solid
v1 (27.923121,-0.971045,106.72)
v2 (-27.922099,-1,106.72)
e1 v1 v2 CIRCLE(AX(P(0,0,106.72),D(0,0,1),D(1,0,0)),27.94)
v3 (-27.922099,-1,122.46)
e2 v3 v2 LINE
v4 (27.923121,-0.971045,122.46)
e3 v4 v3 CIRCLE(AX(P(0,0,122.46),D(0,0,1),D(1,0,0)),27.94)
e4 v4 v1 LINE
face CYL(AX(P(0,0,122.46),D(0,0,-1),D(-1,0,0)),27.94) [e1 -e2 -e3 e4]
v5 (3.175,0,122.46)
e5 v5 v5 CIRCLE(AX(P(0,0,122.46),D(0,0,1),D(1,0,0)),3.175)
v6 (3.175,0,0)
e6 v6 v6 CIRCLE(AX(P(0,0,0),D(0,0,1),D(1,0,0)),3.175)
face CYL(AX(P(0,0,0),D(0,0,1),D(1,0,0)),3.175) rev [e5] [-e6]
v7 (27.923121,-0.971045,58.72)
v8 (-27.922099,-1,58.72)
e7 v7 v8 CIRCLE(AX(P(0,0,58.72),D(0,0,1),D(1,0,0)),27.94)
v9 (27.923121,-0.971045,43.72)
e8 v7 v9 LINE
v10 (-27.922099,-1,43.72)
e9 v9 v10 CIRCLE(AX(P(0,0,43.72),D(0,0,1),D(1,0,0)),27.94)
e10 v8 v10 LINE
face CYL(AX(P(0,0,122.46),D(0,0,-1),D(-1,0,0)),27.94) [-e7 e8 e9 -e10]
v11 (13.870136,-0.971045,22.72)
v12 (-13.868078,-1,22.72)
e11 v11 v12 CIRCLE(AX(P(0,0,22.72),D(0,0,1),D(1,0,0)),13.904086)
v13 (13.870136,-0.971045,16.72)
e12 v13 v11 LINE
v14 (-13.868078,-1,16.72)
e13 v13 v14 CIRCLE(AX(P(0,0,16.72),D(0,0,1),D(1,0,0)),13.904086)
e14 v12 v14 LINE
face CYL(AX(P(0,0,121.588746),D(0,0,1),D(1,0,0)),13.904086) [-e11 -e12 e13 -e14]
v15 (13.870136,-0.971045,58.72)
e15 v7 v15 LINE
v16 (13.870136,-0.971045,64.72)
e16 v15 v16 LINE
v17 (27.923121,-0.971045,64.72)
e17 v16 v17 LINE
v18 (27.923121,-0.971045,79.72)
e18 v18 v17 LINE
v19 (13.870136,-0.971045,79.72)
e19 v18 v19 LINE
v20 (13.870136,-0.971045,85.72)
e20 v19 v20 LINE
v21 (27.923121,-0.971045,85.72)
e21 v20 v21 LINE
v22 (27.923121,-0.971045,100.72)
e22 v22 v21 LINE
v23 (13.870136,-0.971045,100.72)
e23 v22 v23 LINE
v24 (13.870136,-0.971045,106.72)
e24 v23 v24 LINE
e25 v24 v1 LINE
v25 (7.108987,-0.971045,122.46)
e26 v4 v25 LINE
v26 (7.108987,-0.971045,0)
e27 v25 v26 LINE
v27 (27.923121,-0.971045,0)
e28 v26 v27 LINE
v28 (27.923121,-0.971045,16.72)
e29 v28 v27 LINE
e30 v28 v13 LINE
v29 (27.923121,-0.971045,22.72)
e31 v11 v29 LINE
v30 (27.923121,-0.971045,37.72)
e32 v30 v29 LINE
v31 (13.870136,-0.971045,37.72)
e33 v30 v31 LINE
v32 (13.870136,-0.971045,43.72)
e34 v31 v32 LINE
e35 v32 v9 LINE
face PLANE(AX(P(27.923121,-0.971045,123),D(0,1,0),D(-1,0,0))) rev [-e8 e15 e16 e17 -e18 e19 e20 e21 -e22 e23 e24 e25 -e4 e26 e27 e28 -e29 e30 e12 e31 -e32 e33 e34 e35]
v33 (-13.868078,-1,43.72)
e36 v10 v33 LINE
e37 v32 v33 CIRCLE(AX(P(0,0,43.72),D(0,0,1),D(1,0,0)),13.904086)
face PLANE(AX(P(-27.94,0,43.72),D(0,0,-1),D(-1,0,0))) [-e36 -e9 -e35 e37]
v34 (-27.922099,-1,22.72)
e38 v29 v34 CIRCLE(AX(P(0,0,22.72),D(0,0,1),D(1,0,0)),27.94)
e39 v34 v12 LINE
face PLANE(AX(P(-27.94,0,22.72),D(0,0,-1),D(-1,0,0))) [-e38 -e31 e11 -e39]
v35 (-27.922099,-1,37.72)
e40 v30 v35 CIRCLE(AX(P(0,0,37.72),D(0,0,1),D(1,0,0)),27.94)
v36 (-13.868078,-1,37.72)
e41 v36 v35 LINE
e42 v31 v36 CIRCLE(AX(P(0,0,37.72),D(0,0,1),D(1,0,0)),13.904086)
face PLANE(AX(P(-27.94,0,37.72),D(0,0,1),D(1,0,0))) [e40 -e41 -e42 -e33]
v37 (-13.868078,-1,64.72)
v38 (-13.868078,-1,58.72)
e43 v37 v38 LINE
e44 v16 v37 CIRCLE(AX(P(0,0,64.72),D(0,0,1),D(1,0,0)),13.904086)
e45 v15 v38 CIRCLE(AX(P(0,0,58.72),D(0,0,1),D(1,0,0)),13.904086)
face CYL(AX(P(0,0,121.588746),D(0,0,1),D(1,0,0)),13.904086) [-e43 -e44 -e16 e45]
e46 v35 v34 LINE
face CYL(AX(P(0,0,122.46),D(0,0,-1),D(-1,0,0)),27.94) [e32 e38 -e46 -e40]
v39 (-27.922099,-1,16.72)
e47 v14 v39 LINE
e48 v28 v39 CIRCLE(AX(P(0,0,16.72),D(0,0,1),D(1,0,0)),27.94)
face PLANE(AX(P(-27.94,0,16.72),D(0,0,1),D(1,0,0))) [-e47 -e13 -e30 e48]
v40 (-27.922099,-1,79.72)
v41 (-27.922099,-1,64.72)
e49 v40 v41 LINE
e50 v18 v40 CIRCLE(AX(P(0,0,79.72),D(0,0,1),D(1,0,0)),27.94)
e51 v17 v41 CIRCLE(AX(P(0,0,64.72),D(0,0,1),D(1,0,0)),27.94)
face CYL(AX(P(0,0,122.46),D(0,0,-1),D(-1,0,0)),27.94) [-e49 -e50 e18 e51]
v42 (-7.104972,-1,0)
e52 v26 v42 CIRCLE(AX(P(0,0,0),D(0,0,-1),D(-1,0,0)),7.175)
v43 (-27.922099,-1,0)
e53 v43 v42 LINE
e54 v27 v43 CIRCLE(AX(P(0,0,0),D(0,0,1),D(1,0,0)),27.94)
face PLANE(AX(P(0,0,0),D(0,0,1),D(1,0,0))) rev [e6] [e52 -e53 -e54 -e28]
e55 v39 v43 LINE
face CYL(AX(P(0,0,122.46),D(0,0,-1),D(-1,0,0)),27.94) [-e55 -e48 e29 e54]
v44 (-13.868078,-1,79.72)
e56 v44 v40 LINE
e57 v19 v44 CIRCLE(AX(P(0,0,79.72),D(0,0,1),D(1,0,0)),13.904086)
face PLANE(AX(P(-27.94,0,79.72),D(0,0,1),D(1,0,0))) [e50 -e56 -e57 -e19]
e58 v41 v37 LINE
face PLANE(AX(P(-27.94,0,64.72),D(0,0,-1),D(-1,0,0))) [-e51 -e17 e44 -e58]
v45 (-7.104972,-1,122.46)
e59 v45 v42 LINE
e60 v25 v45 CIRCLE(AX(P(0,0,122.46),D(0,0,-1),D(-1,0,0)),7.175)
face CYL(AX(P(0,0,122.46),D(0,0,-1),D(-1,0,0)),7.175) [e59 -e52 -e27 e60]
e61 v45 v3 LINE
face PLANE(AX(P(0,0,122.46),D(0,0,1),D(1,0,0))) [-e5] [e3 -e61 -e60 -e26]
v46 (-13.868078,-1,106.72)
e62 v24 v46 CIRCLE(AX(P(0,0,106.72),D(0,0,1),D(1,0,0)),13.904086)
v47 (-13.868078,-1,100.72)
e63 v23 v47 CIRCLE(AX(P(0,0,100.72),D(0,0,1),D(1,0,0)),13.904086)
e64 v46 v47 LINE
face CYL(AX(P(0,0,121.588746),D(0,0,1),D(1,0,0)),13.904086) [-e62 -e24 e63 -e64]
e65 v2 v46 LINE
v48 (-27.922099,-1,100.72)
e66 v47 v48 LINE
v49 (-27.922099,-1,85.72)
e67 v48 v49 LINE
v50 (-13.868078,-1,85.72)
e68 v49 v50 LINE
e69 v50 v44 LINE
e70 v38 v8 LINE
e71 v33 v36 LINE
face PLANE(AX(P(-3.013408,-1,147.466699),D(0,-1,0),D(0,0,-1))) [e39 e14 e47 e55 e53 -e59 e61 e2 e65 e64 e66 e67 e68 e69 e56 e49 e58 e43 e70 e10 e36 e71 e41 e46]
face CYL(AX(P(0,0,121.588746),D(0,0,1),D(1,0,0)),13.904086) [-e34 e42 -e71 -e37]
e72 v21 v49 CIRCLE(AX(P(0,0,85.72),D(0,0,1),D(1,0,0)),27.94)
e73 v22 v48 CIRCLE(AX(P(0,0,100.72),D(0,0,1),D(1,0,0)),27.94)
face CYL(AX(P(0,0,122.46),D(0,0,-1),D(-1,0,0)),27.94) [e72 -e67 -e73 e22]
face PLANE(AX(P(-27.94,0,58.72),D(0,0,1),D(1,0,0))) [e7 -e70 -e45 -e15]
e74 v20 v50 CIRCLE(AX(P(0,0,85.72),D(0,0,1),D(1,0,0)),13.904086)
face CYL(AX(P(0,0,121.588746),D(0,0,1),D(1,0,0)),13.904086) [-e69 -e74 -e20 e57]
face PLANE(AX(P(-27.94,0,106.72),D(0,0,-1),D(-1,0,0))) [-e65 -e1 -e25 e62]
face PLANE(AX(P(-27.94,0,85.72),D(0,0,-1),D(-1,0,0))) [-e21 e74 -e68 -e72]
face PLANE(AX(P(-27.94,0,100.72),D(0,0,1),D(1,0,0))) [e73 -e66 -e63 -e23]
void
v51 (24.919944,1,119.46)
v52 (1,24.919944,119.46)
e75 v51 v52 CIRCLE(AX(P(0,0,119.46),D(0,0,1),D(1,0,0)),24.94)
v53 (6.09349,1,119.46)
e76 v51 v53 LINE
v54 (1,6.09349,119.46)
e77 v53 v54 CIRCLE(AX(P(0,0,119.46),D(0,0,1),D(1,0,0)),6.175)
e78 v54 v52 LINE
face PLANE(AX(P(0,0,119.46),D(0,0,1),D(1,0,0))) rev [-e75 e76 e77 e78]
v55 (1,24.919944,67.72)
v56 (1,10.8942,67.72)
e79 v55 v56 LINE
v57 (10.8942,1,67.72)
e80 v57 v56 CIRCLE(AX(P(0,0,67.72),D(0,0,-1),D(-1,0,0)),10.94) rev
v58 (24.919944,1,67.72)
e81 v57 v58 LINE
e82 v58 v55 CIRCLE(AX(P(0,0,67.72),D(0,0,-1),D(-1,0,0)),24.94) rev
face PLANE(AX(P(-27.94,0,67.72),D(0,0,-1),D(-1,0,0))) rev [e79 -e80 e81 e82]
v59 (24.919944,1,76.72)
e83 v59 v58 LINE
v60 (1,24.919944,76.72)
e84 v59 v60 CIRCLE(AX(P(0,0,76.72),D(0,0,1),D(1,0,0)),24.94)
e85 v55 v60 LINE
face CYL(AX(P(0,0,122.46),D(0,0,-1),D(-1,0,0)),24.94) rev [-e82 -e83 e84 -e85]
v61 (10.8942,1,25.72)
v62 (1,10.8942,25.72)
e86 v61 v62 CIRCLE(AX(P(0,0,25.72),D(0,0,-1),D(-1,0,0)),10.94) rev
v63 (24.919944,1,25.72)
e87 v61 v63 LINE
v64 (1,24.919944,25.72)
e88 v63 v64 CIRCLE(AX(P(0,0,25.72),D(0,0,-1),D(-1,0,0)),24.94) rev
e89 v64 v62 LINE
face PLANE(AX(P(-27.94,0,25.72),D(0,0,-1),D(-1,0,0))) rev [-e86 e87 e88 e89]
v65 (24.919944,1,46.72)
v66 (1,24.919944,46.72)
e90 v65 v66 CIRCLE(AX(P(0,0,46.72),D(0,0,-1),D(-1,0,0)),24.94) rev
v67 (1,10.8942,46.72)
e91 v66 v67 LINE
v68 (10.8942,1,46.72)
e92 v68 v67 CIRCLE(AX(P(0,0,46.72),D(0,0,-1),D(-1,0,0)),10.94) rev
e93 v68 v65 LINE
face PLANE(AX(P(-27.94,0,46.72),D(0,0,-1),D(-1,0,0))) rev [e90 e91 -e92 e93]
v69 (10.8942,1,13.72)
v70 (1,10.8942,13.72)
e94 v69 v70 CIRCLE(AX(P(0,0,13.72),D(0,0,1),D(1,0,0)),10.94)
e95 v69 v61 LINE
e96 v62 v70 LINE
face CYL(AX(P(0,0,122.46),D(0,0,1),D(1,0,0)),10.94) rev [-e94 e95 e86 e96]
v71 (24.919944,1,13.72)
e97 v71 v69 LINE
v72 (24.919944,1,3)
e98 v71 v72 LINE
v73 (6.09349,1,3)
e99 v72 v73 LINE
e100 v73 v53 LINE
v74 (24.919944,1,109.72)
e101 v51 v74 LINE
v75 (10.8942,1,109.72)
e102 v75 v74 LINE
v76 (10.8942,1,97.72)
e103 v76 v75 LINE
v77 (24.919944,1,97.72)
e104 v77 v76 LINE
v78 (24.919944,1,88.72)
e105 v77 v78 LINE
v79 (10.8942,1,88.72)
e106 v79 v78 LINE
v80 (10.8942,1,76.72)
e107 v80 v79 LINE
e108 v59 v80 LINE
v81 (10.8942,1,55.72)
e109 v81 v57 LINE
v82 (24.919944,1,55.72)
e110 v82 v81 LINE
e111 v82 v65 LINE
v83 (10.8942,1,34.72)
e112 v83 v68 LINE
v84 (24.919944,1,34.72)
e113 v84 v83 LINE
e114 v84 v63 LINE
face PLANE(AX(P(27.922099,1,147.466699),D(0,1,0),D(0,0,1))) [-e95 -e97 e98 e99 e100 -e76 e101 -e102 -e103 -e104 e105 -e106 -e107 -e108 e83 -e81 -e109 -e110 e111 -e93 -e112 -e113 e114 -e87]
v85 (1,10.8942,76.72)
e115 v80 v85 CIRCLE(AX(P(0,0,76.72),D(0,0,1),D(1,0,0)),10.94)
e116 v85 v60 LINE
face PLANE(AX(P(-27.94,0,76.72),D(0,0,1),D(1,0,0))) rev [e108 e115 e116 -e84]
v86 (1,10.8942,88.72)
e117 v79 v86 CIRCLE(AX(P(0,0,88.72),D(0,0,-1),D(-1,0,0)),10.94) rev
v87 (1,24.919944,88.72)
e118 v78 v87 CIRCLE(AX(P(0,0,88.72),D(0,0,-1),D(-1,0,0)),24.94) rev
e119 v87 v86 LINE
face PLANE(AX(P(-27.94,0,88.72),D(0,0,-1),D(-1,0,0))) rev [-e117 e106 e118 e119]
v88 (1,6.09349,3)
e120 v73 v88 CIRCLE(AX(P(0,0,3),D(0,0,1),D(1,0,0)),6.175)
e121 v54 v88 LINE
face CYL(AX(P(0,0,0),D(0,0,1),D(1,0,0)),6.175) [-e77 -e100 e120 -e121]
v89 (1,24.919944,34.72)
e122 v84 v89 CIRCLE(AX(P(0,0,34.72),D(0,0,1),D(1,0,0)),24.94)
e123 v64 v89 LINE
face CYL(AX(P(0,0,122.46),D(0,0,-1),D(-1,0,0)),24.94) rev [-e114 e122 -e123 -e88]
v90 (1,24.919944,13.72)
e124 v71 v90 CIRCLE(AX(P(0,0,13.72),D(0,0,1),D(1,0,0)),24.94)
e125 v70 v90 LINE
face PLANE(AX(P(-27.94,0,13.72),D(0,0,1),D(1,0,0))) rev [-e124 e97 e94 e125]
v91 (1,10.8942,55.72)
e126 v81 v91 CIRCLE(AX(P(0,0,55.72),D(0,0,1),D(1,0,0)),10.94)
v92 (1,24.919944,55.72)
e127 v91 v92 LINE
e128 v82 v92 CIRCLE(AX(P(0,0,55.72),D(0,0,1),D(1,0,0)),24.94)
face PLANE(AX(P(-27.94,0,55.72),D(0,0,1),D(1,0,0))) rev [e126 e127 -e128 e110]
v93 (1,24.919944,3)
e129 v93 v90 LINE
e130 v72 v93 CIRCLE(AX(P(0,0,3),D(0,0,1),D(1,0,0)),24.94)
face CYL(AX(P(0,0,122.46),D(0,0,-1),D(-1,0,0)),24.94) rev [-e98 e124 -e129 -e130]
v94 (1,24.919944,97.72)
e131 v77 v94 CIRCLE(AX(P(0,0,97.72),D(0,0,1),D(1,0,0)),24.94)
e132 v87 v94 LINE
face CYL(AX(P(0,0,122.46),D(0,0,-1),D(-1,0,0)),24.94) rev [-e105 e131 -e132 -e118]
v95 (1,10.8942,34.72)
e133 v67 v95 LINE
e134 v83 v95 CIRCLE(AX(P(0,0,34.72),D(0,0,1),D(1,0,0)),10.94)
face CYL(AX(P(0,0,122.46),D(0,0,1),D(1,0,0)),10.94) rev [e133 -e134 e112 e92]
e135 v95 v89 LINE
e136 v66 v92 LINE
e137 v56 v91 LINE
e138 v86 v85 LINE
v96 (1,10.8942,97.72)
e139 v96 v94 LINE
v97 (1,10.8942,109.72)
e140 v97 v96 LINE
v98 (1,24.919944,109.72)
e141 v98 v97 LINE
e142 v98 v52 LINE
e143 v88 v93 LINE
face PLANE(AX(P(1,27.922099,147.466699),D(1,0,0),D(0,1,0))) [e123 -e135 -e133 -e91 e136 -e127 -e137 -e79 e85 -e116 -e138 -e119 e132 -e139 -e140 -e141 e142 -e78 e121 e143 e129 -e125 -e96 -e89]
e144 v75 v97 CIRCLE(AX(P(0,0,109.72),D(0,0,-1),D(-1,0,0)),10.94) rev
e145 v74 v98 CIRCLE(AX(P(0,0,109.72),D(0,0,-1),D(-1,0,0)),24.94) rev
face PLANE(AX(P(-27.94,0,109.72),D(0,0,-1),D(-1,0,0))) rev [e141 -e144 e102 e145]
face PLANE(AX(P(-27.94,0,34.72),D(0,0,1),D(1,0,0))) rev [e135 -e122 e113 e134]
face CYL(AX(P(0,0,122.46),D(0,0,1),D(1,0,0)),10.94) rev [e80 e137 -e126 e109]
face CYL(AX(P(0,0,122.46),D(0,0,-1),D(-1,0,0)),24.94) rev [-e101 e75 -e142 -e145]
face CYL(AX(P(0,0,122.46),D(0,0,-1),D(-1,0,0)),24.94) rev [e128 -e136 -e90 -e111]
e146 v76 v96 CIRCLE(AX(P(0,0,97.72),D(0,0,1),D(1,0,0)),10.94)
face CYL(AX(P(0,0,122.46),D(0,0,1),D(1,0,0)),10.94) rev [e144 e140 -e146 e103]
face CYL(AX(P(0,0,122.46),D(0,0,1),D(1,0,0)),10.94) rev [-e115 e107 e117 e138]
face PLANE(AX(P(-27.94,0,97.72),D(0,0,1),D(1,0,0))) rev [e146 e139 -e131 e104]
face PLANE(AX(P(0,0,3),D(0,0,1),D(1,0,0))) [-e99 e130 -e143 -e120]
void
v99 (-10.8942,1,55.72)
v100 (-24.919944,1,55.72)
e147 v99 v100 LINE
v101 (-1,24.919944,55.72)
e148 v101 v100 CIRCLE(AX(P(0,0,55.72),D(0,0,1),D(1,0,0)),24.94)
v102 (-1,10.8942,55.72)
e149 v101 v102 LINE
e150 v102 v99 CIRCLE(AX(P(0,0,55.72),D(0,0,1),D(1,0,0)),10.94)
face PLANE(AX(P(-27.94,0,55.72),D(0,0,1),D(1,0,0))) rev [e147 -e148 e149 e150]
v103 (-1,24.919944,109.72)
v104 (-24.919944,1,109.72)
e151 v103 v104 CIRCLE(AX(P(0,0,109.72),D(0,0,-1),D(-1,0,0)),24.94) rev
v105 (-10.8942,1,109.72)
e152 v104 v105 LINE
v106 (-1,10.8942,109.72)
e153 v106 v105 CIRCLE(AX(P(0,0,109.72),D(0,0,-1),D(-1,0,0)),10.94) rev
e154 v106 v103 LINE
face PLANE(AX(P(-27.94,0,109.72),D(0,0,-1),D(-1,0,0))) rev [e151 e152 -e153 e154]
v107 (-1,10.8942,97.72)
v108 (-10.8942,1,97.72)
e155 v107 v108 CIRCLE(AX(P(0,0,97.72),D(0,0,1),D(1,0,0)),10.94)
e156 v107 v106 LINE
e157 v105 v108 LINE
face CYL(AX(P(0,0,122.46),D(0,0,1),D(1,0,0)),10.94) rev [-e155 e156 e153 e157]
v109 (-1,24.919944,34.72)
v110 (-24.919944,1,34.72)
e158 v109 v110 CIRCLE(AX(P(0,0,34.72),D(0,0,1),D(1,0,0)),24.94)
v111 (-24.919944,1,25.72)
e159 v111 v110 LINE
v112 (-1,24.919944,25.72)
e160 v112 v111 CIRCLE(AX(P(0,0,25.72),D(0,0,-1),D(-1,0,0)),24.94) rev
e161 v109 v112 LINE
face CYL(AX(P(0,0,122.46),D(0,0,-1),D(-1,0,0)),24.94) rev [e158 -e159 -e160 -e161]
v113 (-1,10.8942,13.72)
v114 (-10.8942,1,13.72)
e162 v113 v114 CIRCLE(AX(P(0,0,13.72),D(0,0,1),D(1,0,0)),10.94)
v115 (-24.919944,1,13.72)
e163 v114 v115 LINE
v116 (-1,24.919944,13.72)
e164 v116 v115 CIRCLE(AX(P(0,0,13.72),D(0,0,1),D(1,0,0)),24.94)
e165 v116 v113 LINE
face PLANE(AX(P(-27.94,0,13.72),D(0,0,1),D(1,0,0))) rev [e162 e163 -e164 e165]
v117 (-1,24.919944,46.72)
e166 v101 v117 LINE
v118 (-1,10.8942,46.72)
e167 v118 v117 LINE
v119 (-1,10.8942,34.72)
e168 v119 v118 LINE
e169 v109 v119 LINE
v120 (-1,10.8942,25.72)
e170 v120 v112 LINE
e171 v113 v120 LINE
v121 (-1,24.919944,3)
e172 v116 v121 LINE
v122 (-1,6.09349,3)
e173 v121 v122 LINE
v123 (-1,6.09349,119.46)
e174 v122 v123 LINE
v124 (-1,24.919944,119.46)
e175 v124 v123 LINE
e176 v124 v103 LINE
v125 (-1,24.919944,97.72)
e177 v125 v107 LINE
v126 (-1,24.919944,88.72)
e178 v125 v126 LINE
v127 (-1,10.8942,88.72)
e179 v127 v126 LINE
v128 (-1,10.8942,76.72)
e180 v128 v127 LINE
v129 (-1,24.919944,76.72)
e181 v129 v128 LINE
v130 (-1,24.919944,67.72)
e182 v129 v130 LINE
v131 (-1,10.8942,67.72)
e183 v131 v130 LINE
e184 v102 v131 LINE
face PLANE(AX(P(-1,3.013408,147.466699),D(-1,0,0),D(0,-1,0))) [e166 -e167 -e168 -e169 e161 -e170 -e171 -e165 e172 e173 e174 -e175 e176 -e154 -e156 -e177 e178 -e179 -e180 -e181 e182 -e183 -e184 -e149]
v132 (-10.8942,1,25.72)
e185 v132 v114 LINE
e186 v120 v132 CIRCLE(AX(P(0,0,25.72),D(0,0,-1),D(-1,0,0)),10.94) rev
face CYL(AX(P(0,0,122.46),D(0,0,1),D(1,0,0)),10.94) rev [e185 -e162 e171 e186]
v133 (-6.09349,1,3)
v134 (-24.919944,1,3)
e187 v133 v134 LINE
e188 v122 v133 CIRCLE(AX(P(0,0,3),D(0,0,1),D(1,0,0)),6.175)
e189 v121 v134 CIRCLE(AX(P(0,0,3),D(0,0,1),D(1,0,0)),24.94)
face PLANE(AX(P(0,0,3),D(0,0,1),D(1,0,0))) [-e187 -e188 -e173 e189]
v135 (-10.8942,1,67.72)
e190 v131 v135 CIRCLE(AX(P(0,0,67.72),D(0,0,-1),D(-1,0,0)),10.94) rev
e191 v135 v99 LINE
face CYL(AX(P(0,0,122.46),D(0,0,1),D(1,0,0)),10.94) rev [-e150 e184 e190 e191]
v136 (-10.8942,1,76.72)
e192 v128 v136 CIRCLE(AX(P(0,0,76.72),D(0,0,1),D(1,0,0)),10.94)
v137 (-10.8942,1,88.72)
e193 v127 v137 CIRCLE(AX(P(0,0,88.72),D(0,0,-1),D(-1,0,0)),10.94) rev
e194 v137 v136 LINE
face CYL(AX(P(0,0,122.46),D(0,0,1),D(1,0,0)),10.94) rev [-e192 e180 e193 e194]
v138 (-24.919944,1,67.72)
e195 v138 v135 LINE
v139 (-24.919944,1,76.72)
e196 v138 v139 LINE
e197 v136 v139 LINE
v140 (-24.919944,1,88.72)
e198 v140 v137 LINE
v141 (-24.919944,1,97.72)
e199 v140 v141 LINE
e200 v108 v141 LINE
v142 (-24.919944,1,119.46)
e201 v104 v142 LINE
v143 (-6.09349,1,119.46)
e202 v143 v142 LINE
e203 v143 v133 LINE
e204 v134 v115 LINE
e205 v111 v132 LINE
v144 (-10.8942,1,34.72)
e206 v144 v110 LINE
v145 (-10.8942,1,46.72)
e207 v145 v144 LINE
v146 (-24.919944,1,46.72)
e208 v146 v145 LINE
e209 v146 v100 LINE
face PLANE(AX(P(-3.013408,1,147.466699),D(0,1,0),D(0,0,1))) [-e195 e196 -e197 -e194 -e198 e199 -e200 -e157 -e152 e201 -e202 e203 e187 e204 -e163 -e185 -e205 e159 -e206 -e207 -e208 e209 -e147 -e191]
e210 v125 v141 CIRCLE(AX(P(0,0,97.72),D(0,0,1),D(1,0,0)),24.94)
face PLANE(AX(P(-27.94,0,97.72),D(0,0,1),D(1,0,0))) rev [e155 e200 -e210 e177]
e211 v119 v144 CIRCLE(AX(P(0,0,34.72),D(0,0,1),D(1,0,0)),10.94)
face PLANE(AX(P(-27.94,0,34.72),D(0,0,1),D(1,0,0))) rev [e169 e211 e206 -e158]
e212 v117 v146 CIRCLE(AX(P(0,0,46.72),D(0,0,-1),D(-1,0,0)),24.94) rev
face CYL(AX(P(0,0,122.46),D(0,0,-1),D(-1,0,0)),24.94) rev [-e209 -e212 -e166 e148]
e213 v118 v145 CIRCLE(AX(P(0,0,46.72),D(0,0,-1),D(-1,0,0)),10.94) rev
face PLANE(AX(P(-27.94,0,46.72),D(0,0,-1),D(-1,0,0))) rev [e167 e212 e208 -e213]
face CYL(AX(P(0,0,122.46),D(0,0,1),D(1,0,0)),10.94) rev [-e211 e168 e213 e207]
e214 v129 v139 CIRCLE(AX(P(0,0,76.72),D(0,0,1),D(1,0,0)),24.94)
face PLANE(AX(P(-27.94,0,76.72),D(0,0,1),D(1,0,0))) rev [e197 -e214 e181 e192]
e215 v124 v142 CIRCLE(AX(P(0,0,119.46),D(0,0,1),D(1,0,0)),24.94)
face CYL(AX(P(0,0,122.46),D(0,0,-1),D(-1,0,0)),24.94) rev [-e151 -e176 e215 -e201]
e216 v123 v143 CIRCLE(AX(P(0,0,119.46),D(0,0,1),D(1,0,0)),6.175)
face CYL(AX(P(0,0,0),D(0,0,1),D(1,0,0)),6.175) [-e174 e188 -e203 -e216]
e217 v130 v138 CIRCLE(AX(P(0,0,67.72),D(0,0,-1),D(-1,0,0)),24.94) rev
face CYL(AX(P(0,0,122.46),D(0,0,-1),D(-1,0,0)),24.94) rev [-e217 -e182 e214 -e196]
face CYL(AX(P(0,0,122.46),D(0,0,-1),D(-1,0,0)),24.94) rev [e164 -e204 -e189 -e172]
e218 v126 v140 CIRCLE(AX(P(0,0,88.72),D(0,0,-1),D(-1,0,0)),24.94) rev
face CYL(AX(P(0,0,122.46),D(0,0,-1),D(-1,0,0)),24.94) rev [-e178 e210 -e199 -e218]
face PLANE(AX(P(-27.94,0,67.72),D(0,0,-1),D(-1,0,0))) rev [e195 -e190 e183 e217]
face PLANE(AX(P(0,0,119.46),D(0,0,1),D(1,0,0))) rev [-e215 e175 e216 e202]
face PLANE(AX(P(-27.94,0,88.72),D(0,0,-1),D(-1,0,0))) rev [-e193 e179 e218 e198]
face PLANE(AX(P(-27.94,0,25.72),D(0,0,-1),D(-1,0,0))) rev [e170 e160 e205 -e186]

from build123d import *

# Parameters (mm, degrees)
SKETCH3_R            = 27.94
BOSS_EXTRUDE2_DEPTH  = 122.46
SKETCH5_R            = 3.175
CUT_EXTRUDE1_DEPTH   = 129.676877488
SKETCH4_W            = 14
SKETCH4_H            = 6
SHELL1_START         = 3
SHELL1_OUTLINE_R     = 10.94
SHELL1_OUTLINE_R_2   = 6.175
SHELL1_DEPTH         = 116.46
SHELL1_2_OUTLINE_R   = 24.94
SHELL1_2_OUTLINE_R_2 = 10.94
SHELL1_2_DEPTH       = 10.72
SHELL1_START_2       = 109.72
SHELL1_3_OUTLINE_R   = 24.94
SHELL1_3_OUTLINE_R_2 = 10.94
SHELL1_3_DEPTH       = 9.74
SHELL1_START_3       = 25.72
SHELL1_4_OUTLINE_R   = 24.94
SHELL1_4_OUTLINE_R_2 = 10.94
SHELL1_4_DEPTH       = 9
SHELL1_START_4       = 46.72
SHELL1_5_OUTLINE_R   = 24.94
SHELL1_5_OUTLINE_R_2 = 10.94
SHELL1_5_DEPTH       = 9
SHELL1_START_5       = 67.72
SHELL1_6_OUTLINE_R   = 24.94
SHELL1_6_OUTLINE_R_2 = 10.94
SHELL1_6_DEPTH       = 9
SHELL1_START_6       = 88.72
SHELL1_7_OUTLINE_R   = 24.94
SHELL1_7_OUTLINE_R_2 = 10.94
SHELL1_7_DEPTH       = 9
BOSS_EXTRUDE3_REACH  = 130.677
SKETCH13_W           = 16.483162312
SKETCH13_H           = 6
CUT_EXTRUDE3_DEPTH   = 123
BOSS_EXTRUDE4_DEPTH  = 122.46


# Read off the part's stored shape, not the designer's step: Shell1
with BuildPart() as part:
    # Sketch3 → Boss-Extrude2 (new body)
    with BuildSketch(Plane.XY):
        Circle(SKETCH3_R)
    extrude(amount=BOSS_EXTRUDE2_DEPTH)

    # Sketch5 → Cut-Extrude1 (cut, through all)
    with BuildSketch(Plane.XY.offset(122.46)):
        Circle(SKETCH5_R)
    extrude(amount=-CUT_EXTRUDE1_DEPTH, mode=Mode.SUBTRACT)

    # Sketch4 → Cut-Revolve1 (revolve, cut)
    with BuildSketch(Plane(origin=(0, 0, 0), x_dir=(1, 0, 0), z_dir=(0, 1, 0)), mode=Mode.PRIVATE) as cut_revolve1_sk:
        with Locations((-20.94, -103.72)):
            Rectangle(SKETCH4_W, SKETCH4_H)
        with Locations((-20.94, -82.72)):
            Rectangle(SKETCH4_W, SKETCH4_H)
        with Locations((-20.94, -61.72)):
            Rectangle(SKETCH4_W, SKETCH4_H)
        with Locations((-20.94, -40.72)):
            Rectangle(SKETCH4_W, SKETCH4_H)
        with Locations((-20.94, -19.72)):
            Rectangle(SKETCH4_W, SKETCH4_H)
    revolve(cut_revolve1_sk.sketch.rotate(Axis((0, 0, 122.46), (0, 0, -1)), 180), axis=Axis((0, 0, 122.46), (0, 0, -1)), mode=Mode.SUBTRACT)

    # Shell1 outline → Shell1 (cut)
    with BuildSketch(Plane.XY.offset(SHELL1_START)):
        Circle(SHELL1_OUTLINE_R)
        Circle(SHELL1_OUTLINE_R_2, mode=Mode.SUBTRACT)
    extrude(amount=SHELL1_DEPTH, mode=Mode.SUBTRACT)

    # Shell1 2 outline → Shell1 2 (cut)
    with BuildSketch(Plane.XY.offset(SHELL1_START)):
        Circle(SHELL1_2_OUTLINE_R)
        Circle(SHELL1_2_OUTLINE_R_2, mode=Mode.SUBTRACT)
    extrude(amount=SHELL1_2_DEPTH, mode=Mode.SUBTRACT)

    # Shell1 3 outline → Shell1 3 (cut)
    with BuildSketch(Plane.XY.offset(SHELL1_START_2)):
        Circle(SHELL1_3_OUTLINE_R)
        Circle(SHELL1_3_OUTLINE_R_2, mode=Mode.SUBTRACT)
    extrude(amount=SHELL1_3_DEPTH, mode=Mode.SUBTRACT)

    # Shell1 4 outline → Shell1 4 (cut)
    with BuildSketch(Plane.XY.offset(SHELL1_START_3)):
        Circle(SHELL1_4_OUTLINE_R)
        Circle(SHELL1_4_OUTLINE_R_2, mode=Mode.SUBTRACT)
    extrude(amount=SHELL1_4_DEPTH, mode=Mode.SUBTRACT)

    # Shell1 5 outline → Shell1 5 (cut)
    with BuildSketch(Plane.XY.offset(SHELL1_START_4)):
        Circle(SHELL1_5_OUTLINE_R)
        Circle(SHELL1_5_OUTLINE_R_2, mode=Mode.SUBTRACT)
    extrude(amount=SHELL1_5_DEPTH, mode=Mode.SUBTRACT)

    # Shell1 6 outline → Shell1 6 (cut)
    with BuildSketch(Plane.XY.offset(SHELL1_START_5)):
        Circle(SHELL1_6_OUTLINE_R)
        Circle(SHELL1_6_OUTLINE_R_2, mode=Mode.SUBTRACT)
    extrude(amount=SHELL1_6_DEPTH, mode=Mode.SUBTRACT)

    # Shell1 7 outline → Shell1 7 (cut)
    with BuildSketch(Plane.XY.offset(SHELL1_START_6)):
        Circle(SHELL1_7_OUTLINE_R)
        Circle(SHELL1_7_OUTLINE_R_2, mode=Mode.SUBTRACT)
    extrude(amount=SHELL1_7_DEPTH, mode=Mode.SUBTRACT)

    # Boss-Extrude3: up to this face of the body (flat: up to its plane)
    boss_extrude3_end = Plane(part.part.faces().sort_by_distance((-27.149737461, 0, 122.46))[0])
    # Sketch10 → Boss-Extrude3 (add, up to the picked face)
    with BuildSketch(Plane(origin=(0, 0, 0), x_dir=(-1, 0, 0), z_dir=(0, 0, -1)), mode=Mode.PRIVATE) as boss_extrude3_sk1:
        with BuildLine():
            Line((-1, 27.922098775), (-1, 3.01340754))
            ThreePointArc((-1, 3.01340754), (0, 3.175), (1, 3.01340754))
            Line((1, 3.01340754), (1, 27.922098775))
            ThreePointArc((1, 27.922098775), (0, 27.94), (-1, 27.922098775))
        make_face()
    boss_extrude3_tool1 = split(extrude(boss_extrude3_sk1.sketch, amount=-BOSS_EXTRUDE3_REACH, mode=Mode.PRIVATE), bisect_by=boss_extrude3_end, keep=Keep.BOTH, mode=Mode.PRIVATE)
    # Sketch10 → Boss-Extrude3 (add, up to the picked face)
    with BuildSketch(Plane(origin=(0, 0, 0), x_dir=(-1, 0, 0), z_dir=(0, 0, -1)), mode=Mode.PRIVATE) as boss_extrude3_sk2:
        with BuildLine():
            Line((3.01340754, 1), (27.922098775, 1))
            ThreePointArc((27.922098775, 1), (27.94, 0), (27.922098775, -1))
            Line((27.922098775, -1), (3.01340754, -1))
            ThreePointArc((3.01340754, -1), (3.175, 0), (3.01340754, 1))
        make_face()
    boss_extrude3_tool2 = split(extrude(boss_extrude3_sk2.sketch, amount=-BOSS_EXTRUDE3_REACH, mode=Mode.PRIVATE), bisect_by=boss_extrude3_end, keep=Keep.BOTH, mode=Mode.PRIVATE)
    # Sketch10 → Boss-Extrude3 (add, up to the picked face)
    with BuildSketch(Plane(origin=(0, 0, 0), x_dir=(-1, 0, 0), z_dir=(0, 0, -1)), mode=Mode.PRIVATE) as boss_extrude3_sk3:
        with BuildLine():
            Line((-1, -3.01340754), (-1, -27.922098775))
            ThreePointArc((-1, -27.922098775), (0, -27.94), (1, -27.922098775))
            Line((1, -27.922098775), (1, -3.01340754))
            ThreePointArc((1, -3.01340754), (0, -3.175), (-1, -3.01340754))
        make_face()
    boss_extrude3_tool3 = split(extrude(boss_extrude3_sk3.sketch, amount=-BOSS_EXTRUDE3_REACH, mode=Mode.PRIVATE), bisect_by=boss_extrude3_end, keep=Keep.BOTH, mode=Mode.PRIVATE)
    # Sketch10 → Boss-Extrude3 (add, up to the picked face)
    with BuildSketch(Plane(origin=(0, 0, 0), x_dir=(-1, 0, 0), z_dir=(0, 0, -1)), mode=Mode.PRIVATE) as boss_extrude3_sk4:
        with BuildLine():
            Line((-27.922098775, -1), (-3.01340754, -1))
            ThreePointArc((-3.01340754, -1), (-3.175, 0), (-3.01340754, 1))
            Line((-3.01340754, 1), (-27.922098775, 1))
            ThreePointArc((-27.922098775, 1), (-27.94, 0), (-27.922098775, -1))
        make_face()
    boss_extrude3_tool4 = split(extrude(boss_extrude3_sk4.sketch, amount=-BOSS_EXTRUDE3_REACH, mode=Mode.PRIVATE), bisect_by=boss_extrude3_end, keep=Keep.BOTH, mode=Mode.PRIVATE)
    add(boss_extrude3_tool1.solids().sort_by(Axis((0, 15.527819, 0), (0, 0, 1)))[0])
    add(boss_extrude3_tool2.solids().sort_by(Axis((-15.527819, 0, 0), (0, 0, 1)))[0])
    add(boss_extrude3_tool3.solids().sort_by(Axis((0, -15.527819, 0), (0, 0, 1)))[0])
    add(boss_extrude3_tool4.solids().sort_by(Axis((15.527819, 0, 0), (0, 0, 1)))[0])

    # Sketch13 → Cut-Revolve2 (revolve, cut)
    with BuildSketch(Plane(origin=(0, 0, 0), x_dir=(1, 0, 0), z_dir=(0, 1, 0)), mode=Mode.PRIVATE) as cut_revolve2_sk:
        with Locations((-22.145666886, -40.72)):
            Rectangle(SKETCH13_W, SKETCH13_H)
        with Locations((-22.145666886, -19.72)):
            Rectangle(SKETCH13_W, SKETCH13_H)
        with Locations((-22.145666886, -61.72)):
            Rectangle(SKETCH13_W, SKETCH13_H)
        with Locations((-22.145666886, -82.72)):
            Rectangle(SKETCH13_W, SKETCH13_H)
        with Locations((-22.145666886, -103.72)):
            Rectangle(SKETCH13_W, SKETCH13_H)
    revolve(cut_revolve2_sk.sketch.rotate(Axis((0, 0, 121.588746248), (0, 0, -1)), 180), axis=Axis((0, 0, 121.588746248), (0, 0, -1)), mode=Mode.SUBTRACT)

    # Sketch16 → Cut-Extrude3 (cut)
    with BuildSketch(Plane(origin=(0, 0, 0), x_dir=(-1, 0, 0), z_dir=(0, 0, -1))):
        with BuildLine():
            Line((-27.923120749, -0.971044624), (-6.098171639, -0.971044624))
            ThreePointArc((-6.098171639, -0.971044624), (-0.014665674, -6.174982584), (6.093490379, -1))
            Line((6.093490379, -1), (27.922098775, -1))
            ThreePointArc((27.922098775, -1), (-0.014486703, -27.939996244), (-27.923120749, -0.971044624))
        make_face()
    extrude(amount=-CUT_EXTRUDE3_DEPTH, mode=Mode.SUBTRACT)

    # Sketch17 → Boss-Extrude4 (add)
    with BuildSketch(Plane(origin=(0, 0, 0), x_dir=(-1, 0, 0), z_dir=(0, 0, -1))):
        with BuildLine():
            Line((-6.098171639, -0.971044624), (-7.108987082, -0.971044624))
            ThreePointArc((-7.108987082, -0.971044624), (-0.014616223, -7.174985113), (7.104971851, -1))
            Line((7.104971851, -1), (6.093490379, -1))
            ThreePointArc((6.093490379, -1), (-0.014665674, -6.174982584), (-6.098171639, -0.971044624))
        make_face()
    extrude(amount=-BOSS_EXTRUDE4_DEPTH)


solid = part.part
